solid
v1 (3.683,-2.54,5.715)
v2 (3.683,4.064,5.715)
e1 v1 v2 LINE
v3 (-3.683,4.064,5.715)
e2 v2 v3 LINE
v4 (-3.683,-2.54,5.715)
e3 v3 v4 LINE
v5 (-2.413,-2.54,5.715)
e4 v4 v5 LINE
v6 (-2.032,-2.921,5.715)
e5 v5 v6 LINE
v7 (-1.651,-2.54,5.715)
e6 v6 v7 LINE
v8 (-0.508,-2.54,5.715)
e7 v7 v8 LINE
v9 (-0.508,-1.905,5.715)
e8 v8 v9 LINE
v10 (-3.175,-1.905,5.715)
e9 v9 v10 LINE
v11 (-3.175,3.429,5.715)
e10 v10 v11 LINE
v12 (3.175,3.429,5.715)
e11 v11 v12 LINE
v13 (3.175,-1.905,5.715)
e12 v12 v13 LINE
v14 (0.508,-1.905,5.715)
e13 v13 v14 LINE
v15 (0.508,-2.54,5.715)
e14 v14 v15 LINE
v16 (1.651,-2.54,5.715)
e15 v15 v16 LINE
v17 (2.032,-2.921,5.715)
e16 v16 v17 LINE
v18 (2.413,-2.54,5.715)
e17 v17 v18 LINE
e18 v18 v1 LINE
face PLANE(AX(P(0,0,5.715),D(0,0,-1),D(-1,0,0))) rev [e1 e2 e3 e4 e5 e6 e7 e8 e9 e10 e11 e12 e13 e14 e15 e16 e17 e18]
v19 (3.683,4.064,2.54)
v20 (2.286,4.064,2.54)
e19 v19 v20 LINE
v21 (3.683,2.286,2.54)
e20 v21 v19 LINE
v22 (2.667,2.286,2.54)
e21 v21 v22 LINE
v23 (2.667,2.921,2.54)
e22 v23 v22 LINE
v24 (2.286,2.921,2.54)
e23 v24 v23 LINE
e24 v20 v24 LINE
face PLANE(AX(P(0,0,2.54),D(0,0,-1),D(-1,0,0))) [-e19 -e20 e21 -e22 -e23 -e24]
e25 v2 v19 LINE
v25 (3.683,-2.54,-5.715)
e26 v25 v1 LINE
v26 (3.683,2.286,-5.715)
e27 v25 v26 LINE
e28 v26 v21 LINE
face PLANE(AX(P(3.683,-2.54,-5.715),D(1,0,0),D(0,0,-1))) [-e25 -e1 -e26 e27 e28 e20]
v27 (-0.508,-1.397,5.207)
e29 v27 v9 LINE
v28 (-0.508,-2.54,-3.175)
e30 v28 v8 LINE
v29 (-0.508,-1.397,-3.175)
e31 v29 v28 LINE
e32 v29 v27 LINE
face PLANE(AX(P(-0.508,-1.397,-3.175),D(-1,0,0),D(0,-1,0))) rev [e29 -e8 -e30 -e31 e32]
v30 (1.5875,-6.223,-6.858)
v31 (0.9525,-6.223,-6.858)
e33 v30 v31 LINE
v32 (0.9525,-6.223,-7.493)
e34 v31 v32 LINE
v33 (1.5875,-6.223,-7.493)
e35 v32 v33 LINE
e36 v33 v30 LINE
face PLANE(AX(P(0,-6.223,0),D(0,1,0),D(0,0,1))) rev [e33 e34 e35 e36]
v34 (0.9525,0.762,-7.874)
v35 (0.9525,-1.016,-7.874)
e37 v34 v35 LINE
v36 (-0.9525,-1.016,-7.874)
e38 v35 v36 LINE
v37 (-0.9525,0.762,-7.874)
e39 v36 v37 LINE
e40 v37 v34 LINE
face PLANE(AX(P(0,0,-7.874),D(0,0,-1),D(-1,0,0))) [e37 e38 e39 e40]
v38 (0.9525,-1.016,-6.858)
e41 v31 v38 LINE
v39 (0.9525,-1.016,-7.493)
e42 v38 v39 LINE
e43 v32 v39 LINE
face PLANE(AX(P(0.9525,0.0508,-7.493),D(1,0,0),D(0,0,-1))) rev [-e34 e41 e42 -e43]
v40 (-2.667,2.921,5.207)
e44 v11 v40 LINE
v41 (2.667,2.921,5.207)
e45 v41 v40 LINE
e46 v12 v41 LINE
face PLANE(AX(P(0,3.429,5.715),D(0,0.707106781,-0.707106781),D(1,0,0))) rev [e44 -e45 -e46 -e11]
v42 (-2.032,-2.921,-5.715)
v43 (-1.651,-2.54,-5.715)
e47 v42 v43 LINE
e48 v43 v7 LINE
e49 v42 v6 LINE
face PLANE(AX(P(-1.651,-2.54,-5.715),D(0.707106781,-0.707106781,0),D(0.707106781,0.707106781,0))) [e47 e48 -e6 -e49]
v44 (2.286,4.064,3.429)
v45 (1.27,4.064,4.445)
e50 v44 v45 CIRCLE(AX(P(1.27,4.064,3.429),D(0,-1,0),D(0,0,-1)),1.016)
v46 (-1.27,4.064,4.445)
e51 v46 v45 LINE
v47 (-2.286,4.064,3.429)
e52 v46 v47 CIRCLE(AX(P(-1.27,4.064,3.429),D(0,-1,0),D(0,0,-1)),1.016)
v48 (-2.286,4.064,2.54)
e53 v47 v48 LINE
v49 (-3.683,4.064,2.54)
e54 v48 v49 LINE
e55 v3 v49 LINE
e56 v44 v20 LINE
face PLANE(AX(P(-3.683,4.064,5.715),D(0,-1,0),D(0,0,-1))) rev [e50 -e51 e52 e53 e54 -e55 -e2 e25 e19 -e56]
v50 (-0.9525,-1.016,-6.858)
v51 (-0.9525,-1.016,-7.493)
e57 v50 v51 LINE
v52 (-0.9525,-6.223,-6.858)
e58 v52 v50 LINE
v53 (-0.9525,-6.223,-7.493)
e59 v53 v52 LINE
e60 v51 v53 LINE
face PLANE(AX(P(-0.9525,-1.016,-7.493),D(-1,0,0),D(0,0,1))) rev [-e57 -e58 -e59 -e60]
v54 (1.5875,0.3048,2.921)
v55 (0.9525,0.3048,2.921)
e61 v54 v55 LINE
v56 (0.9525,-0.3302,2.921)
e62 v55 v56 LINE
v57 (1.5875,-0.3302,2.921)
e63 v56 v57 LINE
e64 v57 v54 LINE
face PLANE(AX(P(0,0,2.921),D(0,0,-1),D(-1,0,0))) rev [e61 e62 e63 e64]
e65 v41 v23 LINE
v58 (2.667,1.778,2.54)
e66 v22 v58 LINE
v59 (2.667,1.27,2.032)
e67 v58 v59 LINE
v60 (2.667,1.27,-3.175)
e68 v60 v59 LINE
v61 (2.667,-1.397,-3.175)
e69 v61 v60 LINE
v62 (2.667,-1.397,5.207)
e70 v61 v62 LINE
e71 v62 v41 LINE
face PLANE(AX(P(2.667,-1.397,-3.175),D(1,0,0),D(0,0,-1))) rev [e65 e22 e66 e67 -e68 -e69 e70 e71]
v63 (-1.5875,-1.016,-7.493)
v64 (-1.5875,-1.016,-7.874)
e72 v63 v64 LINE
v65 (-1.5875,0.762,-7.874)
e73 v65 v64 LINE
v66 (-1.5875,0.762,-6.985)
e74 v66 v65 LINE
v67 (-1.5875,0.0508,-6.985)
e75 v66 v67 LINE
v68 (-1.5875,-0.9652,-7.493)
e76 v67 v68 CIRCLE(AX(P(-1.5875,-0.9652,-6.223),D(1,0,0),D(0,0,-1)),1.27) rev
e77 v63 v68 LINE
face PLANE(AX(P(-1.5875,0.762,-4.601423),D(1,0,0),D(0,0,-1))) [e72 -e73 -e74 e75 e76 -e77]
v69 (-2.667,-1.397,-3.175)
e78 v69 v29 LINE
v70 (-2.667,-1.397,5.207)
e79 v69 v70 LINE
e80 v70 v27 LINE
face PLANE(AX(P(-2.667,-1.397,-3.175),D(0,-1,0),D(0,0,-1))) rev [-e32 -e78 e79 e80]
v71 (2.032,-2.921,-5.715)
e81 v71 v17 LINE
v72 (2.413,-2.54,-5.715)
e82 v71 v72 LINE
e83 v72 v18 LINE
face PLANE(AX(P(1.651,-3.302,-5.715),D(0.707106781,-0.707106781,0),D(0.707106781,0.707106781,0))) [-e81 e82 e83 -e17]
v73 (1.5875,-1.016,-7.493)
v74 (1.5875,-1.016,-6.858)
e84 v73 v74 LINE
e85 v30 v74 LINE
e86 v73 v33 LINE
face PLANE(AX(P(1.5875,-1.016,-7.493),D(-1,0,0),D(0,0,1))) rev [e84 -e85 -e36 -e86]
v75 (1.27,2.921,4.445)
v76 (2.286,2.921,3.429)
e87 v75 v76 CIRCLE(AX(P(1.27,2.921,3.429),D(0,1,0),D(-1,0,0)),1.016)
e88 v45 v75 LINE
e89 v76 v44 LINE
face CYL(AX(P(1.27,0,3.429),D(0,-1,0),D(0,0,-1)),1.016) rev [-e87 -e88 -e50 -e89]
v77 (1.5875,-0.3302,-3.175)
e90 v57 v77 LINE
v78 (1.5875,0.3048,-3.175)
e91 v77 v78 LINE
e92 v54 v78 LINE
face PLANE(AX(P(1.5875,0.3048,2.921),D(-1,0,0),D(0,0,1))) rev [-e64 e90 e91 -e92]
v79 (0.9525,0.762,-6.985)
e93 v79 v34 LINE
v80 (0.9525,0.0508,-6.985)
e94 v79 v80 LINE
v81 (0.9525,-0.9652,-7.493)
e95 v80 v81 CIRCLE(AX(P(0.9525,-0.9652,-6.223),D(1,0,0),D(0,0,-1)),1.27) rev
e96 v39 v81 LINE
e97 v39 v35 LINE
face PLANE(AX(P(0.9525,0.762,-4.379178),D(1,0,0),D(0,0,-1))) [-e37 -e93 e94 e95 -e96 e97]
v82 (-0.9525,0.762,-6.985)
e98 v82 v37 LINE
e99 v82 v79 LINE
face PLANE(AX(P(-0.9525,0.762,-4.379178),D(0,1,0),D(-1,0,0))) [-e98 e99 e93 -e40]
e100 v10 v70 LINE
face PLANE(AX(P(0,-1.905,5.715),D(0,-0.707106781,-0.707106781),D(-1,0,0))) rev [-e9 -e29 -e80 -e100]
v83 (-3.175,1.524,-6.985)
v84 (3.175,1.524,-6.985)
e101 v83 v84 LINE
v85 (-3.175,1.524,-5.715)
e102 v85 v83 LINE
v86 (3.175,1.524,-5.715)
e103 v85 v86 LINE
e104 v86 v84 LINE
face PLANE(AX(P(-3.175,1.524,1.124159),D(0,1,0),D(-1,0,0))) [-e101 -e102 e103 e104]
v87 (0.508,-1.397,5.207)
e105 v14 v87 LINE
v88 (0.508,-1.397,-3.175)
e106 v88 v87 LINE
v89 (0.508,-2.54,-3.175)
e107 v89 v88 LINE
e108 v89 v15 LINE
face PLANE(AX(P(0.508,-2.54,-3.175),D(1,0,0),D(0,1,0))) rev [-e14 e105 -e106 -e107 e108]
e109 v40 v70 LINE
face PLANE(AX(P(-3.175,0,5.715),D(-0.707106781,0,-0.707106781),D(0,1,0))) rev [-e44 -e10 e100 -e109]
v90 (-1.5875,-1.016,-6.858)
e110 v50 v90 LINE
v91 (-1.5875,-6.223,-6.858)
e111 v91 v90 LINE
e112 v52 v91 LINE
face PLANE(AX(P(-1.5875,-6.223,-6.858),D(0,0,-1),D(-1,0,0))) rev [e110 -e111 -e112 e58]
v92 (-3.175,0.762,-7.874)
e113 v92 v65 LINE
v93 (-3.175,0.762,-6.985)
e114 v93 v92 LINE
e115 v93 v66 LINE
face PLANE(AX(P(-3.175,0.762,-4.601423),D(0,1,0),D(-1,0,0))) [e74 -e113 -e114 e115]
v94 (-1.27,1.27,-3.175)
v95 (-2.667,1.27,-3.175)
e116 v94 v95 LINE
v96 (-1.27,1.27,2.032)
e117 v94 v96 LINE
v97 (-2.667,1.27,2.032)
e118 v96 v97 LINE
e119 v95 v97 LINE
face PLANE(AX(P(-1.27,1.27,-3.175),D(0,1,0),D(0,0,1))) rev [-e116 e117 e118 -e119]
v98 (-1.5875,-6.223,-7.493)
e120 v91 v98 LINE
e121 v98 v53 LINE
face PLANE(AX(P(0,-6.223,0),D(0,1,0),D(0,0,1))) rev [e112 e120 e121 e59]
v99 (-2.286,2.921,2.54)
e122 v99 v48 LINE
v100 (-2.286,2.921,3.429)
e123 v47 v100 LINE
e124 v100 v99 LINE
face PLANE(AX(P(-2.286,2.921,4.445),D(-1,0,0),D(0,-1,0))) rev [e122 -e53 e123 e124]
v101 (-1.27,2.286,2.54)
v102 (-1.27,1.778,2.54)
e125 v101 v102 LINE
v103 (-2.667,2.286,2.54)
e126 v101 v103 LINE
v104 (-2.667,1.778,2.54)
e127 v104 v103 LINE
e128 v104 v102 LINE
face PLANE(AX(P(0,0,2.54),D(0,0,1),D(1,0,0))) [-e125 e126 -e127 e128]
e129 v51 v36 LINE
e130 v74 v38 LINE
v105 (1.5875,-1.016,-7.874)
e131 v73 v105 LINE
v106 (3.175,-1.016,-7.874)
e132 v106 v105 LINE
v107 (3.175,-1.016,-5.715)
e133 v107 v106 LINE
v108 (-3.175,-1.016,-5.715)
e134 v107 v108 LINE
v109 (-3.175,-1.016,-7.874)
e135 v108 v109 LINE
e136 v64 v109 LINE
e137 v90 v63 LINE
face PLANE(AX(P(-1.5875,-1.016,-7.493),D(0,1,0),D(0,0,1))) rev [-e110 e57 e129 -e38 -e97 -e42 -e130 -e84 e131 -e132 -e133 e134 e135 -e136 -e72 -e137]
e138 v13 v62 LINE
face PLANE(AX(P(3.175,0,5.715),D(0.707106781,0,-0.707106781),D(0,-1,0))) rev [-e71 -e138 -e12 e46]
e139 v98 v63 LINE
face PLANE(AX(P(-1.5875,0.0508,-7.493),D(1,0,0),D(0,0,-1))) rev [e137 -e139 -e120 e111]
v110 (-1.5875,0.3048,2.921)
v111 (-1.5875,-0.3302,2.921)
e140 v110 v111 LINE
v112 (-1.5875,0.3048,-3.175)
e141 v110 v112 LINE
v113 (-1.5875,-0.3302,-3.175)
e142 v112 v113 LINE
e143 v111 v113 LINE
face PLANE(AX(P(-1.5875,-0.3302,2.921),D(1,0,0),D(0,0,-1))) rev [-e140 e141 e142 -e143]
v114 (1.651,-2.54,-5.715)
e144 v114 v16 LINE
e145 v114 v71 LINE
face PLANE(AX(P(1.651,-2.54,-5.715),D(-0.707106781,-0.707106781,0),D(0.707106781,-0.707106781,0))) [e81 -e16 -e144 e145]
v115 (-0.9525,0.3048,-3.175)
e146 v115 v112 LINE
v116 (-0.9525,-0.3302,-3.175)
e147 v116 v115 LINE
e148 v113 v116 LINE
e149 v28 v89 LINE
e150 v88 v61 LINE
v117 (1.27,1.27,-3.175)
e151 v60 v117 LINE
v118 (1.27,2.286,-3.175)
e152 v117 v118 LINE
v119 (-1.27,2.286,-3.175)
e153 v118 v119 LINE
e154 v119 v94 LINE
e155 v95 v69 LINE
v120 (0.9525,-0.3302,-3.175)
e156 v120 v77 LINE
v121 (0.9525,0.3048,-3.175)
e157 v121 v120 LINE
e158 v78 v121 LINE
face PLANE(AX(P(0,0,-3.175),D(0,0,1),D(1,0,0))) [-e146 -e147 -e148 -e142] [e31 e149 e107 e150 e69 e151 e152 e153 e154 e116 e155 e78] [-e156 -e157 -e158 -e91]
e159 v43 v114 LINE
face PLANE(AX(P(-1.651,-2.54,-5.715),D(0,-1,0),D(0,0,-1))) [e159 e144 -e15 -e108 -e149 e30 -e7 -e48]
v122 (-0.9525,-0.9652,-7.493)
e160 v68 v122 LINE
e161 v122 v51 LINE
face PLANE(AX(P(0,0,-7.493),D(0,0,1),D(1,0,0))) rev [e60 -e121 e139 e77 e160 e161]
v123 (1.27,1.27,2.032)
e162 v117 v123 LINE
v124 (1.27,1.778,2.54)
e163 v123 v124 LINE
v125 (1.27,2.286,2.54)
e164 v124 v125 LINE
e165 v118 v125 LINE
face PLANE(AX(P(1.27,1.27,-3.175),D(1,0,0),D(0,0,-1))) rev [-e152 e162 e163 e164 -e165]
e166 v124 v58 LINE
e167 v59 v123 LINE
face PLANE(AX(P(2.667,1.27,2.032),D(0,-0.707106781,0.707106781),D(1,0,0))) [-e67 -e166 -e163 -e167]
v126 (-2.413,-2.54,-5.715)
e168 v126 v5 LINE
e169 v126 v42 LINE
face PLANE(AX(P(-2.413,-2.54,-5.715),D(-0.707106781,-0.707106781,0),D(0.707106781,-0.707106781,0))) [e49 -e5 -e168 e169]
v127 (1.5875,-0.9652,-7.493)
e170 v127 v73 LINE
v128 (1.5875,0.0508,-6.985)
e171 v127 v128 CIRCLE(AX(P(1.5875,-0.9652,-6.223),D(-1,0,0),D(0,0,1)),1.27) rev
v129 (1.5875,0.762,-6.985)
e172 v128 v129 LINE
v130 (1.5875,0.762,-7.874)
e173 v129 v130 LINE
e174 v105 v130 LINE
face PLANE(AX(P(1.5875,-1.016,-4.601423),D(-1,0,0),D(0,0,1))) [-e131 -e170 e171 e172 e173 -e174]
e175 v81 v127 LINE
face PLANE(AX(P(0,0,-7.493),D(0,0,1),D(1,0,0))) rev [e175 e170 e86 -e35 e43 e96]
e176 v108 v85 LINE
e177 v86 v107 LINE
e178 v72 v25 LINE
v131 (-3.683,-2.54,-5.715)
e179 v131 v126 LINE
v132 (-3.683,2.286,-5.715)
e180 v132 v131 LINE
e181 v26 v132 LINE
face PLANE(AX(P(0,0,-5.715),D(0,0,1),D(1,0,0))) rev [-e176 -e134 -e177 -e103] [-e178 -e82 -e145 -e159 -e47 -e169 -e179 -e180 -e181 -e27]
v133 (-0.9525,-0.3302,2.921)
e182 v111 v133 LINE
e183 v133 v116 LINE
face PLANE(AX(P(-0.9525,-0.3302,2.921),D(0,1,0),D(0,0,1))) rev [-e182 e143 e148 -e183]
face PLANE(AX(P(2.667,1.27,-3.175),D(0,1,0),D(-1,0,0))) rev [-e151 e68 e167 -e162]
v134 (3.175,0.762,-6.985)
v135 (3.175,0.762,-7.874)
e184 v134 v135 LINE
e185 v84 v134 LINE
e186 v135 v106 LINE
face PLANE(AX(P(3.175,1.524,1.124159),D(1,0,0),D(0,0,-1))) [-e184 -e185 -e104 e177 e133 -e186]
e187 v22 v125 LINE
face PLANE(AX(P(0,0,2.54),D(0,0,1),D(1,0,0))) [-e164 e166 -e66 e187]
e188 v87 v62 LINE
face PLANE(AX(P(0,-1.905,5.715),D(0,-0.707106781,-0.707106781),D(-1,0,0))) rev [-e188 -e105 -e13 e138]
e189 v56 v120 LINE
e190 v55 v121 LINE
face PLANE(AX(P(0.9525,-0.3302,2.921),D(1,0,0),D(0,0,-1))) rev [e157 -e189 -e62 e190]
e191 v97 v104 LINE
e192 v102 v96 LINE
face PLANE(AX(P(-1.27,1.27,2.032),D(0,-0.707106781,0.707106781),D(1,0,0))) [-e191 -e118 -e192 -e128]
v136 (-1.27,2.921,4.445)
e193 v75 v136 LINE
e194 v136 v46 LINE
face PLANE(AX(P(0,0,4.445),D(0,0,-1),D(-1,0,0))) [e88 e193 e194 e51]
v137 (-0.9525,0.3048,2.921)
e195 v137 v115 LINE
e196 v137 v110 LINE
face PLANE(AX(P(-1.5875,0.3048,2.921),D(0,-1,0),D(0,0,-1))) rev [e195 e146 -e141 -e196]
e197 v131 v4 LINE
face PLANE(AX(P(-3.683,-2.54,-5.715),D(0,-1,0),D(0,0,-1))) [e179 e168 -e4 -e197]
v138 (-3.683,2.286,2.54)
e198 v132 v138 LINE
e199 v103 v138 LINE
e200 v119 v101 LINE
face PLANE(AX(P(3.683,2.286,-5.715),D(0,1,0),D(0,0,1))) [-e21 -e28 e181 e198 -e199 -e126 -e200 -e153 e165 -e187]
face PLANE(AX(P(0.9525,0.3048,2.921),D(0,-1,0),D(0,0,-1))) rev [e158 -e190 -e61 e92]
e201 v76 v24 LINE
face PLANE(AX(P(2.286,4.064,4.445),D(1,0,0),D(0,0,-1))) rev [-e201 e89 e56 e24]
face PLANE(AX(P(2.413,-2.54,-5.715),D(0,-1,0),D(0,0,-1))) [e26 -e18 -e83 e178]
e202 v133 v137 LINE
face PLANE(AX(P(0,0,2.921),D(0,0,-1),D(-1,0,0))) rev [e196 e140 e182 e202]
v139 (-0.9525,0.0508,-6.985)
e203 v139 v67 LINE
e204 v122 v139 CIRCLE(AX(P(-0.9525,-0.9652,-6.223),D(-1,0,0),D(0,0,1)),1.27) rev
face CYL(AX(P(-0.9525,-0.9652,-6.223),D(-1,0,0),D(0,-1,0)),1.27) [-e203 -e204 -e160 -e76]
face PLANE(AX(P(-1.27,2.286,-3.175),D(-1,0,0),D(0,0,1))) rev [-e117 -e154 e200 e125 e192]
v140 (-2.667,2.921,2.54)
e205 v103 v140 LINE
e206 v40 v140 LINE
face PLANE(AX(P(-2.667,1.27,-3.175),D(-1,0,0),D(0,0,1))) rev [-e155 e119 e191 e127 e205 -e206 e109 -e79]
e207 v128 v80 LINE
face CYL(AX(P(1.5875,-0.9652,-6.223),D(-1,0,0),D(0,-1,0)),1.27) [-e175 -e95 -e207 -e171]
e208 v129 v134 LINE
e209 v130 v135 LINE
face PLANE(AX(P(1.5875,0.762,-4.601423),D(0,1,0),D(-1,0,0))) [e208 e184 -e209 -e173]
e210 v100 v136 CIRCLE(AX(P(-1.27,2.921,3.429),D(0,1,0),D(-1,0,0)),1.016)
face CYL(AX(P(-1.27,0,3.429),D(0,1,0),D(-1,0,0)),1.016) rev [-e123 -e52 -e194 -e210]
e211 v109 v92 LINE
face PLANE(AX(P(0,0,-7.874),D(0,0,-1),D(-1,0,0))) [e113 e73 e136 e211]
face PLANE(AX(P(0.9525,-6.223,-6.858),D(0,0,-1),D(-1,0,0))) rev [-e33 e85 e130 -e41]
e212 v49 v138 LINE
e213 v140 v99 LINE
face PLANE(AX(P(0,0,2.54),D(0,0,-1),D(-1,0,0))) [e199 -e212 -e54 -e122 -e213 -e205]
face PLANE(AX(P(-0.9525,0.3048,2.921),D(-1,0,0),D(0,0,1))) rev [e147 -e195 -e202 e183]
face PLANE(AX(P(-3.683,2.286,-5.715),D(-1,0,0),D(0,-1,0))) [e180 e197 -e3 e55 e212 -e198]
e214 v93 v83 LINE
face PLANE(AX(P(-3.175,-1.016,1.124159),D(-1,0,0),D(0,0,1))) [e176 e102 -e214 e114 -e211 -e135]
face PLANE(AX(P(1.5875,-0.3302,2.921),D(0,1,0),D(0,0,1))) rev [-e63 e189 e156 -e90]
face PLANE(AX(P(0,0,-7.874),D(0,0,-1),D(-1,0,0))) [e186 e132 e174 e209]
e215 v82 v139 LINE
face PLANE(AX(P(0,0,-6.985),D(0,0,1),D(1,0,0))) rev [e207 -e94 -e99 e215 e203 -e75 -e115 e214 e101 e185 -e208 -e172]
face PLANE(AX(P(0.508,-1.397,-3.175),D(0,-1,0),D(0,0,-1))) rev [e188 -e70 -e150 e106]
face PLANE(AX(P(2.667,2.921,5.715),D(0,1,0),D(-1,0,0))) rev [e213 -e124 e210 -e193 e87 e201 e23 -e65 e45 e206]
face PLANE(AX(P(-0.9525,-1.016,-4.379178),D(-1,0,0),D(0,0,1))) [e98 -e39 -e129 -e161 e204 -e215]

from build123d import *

# Parameters (mm, degrees)
BOSS_EXTRUDE1_DEPTH  = 8.255000001
CUT_EXTRUDE1_DEPTH   = 5.715
BOSS_EXTRUDE2_DEPTH  = 3.175
SKETCH4_W            = 4.572
SKETCH4_H            = 1.143
CUT_EXTRUDE2_DEPTH   = 1.905
SKETCH5_W            = 0.635
SKETCH5_H            = 0.635
BOSS_EXTRUDE3_DEPTH  = 6.096
SKETCH6_W            = 0.635
SKETCH6_H            = 0.635
BOSS_EXTRUDE4_DEPTH  = 6.096
SKETCH7_W            = 0.635
SKETCH7_H            = 1.0668
BOSS_EXTRUDE5_DEPTH  = 1.778
SKETCH8_W            = 0.635
SKETCH8_H            = 1.0668
BOSS_EXTRUDE6_DEPTH  = 1.778
SKETCH9_W            = 0.635
SKETCH9_H            = 0.635
BOSS_EXTRUDE7_DEPTH  = 5.207
SKETCH10_W           = 0.635
SKETCH10_H           = 0.635
BOSS_EXTRUDE8_DEPTH  = 5.207
BOSS_EXTRUDE9_DEPTH  = 1.27
SKETCH12_W           = 1.5875
SKETCH12_H           = 1.778
BOSS_EXTRUDE10_DEPTH = 0.889
SKETCH13_W           = 1.905
SKETCH13_H           = 1.778
BOSS_EXTRUDE11_DEPTH = 0.889
SKETCH14_W           = 1.5875
SKETCH14_H           = 1.778
BOSS_EXTRUDE12_DEPTH = 0.889
FILLET1_R            = 1.27
FILLET2_R            = 1.27
CHAMFER1_SIZE        = 0.508
CHAMFER2_SIZE        = 0.508
DRAFT1_ANGLE         = 45
CHAMFER3_SIZE        = 0.508
FILLET3_R            = 1.016


with BuildPart() as part:
    # Sketch1 → Boss-Extrude1 (new body)
    with BuildSketch(Plane.XY.offset(2.54)):
        Polygon((3.683, 2.286), (-3.683, 2.286), (-3.683, -2.54), (-2.413, -2.54), (-1.651, -3.302), (-1.651, -2.54), (1.651, -2.54), (1.651, -3.302), (2.413, -2.54), (3.683, -2.54), align=None)
    extrude(amount=-BOSS_EXTRUDE1_DEPTH)

    # Sketch2 → Cut-Extrude1 (cut)
    with BuildSketch(Plane.XY.offset(2.54)):
        Polygon((2.667, -1.397), (2.667, 1.27), (1.27, 1.27), (1.27, 2.286000001), (-1.270000001, 2.286000001), (-1.270000001, 1.27), (-2.667, 1.27), (-2.667, -1.397), (-0.508, -1.397), (-0.508, -2.54), (0.508, -2.54), (0.508, -1.397), align=None)
    extrude(amount=-CUT_EXTRUDE1_DEPTH, mode=Mode.SUBTRACT)

    # Sketch3 → Boss-Extrude2 (add)
    with BuildSketch(Plane.XY.offset(2.54)):
        Polygon((0.508, -1.397), (2.667, -1.397), (2.667, 2.921), (-2.667, 2.921), (-2.667, -1.397), (-0.508, -1.397), (-0.508, -2.54), (-1.651, -2.54), (-1.651, -3.302), (-2.413, -2.54), (-3.683, -2.54), (-3.683, 4.064), (3.683, 4.064), (3.683, -2.54), (2.413, -2.54), (1.651, -3.302), (1.651, -2.54), (0.508, -2.54), align=None)
    extrude(amount=BOSS_EXTRUDE2_DEPTH)

    # Sketch4 → Cut-Extrude2 (cut)
    with BuildSketch(Plane(origin=(0, 0, 2.54), x_dir=(-1, 0, 0), z_dir=(0, 0, -1))):
        with Locations((0, 3.4925)):
            Rectangle(SKETCH4_W, SKETCH4_H)
    extrude(amount=-CUT_EXTRUDE2_DEPTH, mode=Mode.SUBTRACT)

    # Sketch5 → Boss-Extrude3 (add)
    with BuildSketch(Plane.XY.offset(-3.175)):
        with Locations((-1.27, -0.0127)):
            Rectangle(SKETCH5_W, SKETCH5_H)
    extrude(amount=BOSS_EXTRUDE3_DEPTH)

    # Sketch6 → Boss-Extrude4 (add)
    with BuildSketch(Plane.XY.offset(-3.175)):
        with Locations((1.27, -0.0127)):
            Rectangle(SKETCH6_W, SKETCH6_H)
    extrude(amount=BOSS_EXTRUDE4_DEPTH)

    # Sketch7 → Boss-Extrude5 (add)
    with BuildSketch(Plane(origin=(0, 0, -5.715000001), x_dir=(-1, 0, 0), z_dir=(0, 0, -1))):
        with Locations((1.27, -0.4826)):
            Rectangle(SKETCH7_W, SKETCH7_H)
    extrude(amount=BOSS_EXTRUDE5_DEPTH)

    # Sketch8 → Boss-Extrude6 (add)
    with BuildSketch(Plane(origin=(0, 0, -5.715000001), x_dir=(-1, 0, 0), z_dir=(0, 0, -1))):
        with Locations((-1.27, -0.4826)):
            Rectangle(SKETCH8_W, SKETCH8_H)
    extrude(amount=BOSS_EXTRUDE6_DEPTH)

    # Sketch9 → Boss-Extrude7 (add)
    with BuildSketch(Plane.XZ.offset(1.016)):
        with Locations((-1.27, -7.1755)):
            Rectangle(SKETCH9_W, SKETCH9_H)
    extrude(amount=BOSS_EXTRUDE7_DEPTH)

    # Sketch10 → Boss-Extrude8 (add)
    with BuildSketch(Plane.XZ.offset(1.016)):
        with Locations((1.27, -7.1755)):
            Rectangle(SKETCH10_W, SKETCH10_H)
    extrude(amount=BOSS_EXTRUDE8_DEPTH)

    # Sketch11 → Boss-Extrude9 (add)
    with BuildSketch(Plane(origin=(0, 0, -6.985), x_dir=(-1, 0, 0), z_dir=(0, 0, -1))):
        Polygon((0.9525, 0.050800001), (1.5875, 0.050800001), (1.5875, -1.016), (3.175, -1.016), (3.175, 1.524), (-3.175, 1.524), (-3.175, -1.016), (-1.5875, -1.016), (-1.5875, 0.050800001), (-0.9525, 0.050800001), (-0.9525, -1.016), (0.9525, -1.016), align=None)
    extrude(amount=-BOSS_EXTRUDE9_DEPTH)

    # Sketch12 → Boss-Extrude10 (add)
    with BuildSketch(Plane(origin=(0, 0, -7.874), x_dir=(-1, 0, 0), z_dir=(0, 0, -1))):
        with Locations((2.38125, -0.127)):
            Rectangle(SKETCH12_W, SKETCH12_H)
    extrude(amount=-BOSS_EXTRUDE10_DEPTH)

    # Sketch13 → Boss-Extrude11 (add)
    with BuildSketch(Plane(origin=(0, 0, -7.874), x_dir=(-1, 0, 0), z_dir=(0, 0, -1))):
        with Locations((0, -0.127)):
            Rectangle(SKETCH13_W, SKETCH13_H)
    extrude(amount=-BOSS_EXTRUDE11_DEPTH)

    # Sketch14 → Boss-Extrude12 (add)
    with BuildSketch(Plane(origin=(0, 0, -7.874), x_dir=(-1, 0, 0), z_dir=(0, 0, -1))):
        with Locations((-2.38125, -0.127)):
            Rectangle(SKETCH14_W, SKETCH14_H)
    extrude(amount=-BOSS_EXTRUDE12_DEPTH)

    # Fillet1
    # the kernel refuses this fillet: 1.27 mm, written as the material it takes off along each edge
    with BuildSketch(Plane(origin=(1.5875, 0.0508, -7.493), x_dir=(0, -1, 0), z_dir=(-1, 0, 0))) as fillet1_piece_1:
        with BuildLine():
            CenterArc((1.016, 1.27), FILLET1_R, 216.869897624, 53.130102376)
            Line((0, 0.508), (0, 0))
            Line((0, 0), (1.016, 0))
        make_face()
    extrude(amount=0.635, mode=Mode.SUBTRACT)

    # Fillet2
    # the kernel refuses this fillet: 1.27 mm, written as the material it takes off along each edge
    with BuildSketch(Plane(origin=(1.5875, 0.0508, -7.493), x_dir=(0, -1, 0), z_dir=(-1, 0, 0))) as fillet2_piece_1_section:
        with BuildLine():
            CenterArc((1.016, 1.27), FILLET2_R, 216.869897624, 53.130102376)
            Line((0, 0.508), (-0.02032, 0.49276))
            ThreePointArc((-0.02032, 0.49276), (-0.0254, 0.254), (-0.0254, 0))
            Line((-0.0254, 0), (0, -0.0254))
            Line((0, -0.0254), (1.016, -0.0254))
            Line((1.016, -0.0254), (1.016, 0))
        make_face()
    fillet2_piece_1 = extrude(amount=3.175, mode=Mode.PRIVATE)
    fillet2_piece_1 = split(fillet2_piece_1, bisect_by=Plane(origin=(0.9525, -0.210671932, -7.36296659), z_dir=(1, 0, 0)), keep=Keep.TOP, mode=Mode.PRIVATE)
    add(fillet2_piece_1, mode=Mode.SUBTRACT)
    with BuildSketch(Plane(origin=(-0.9525, 0.0508, -7.493), x_dir=(0, -1, 0), z_dir=(-1, 0, 0))) as fillet2_piece_2:
        with BuildLine():
            CenterArc((1.016, 1.27), FILLET2_R, 216.869897624, 53.130102376)
            Line((0, 0.508), (-0.02032, 0.49276))
            ThreePointArc((-0.02032, 0.49276), (-0.0254, 0.254), (-0.0254, 0))
            Line((-0.0254, 0), (0, -0.0254))
            Line((0, -0.0254), (1.016, -0.0254))
            Line((1.016, -0.0254), (1.016, 0))
        make_face()
    extrude(amount=0.635, mode=Mode.SUBTRACT)

    # Chamfer1
    chamfer1_edges = [part.edges().sort_by_distance(p)[0] for p in [
        (1.9685, 1.27, 2.54),
    ]]
    chamfer(chamfer1_edges, length=CHAMFER1_SIZE)

    # Chamfer2
    chamfer2_edges = [part.edges().sort_by_distance(p)[0] for p in [
        (-1.9685, 1.27, 2.54),
    ]]
    chamfer(chamfer2_edges, length=CHAMFER2_SIZE)

    # Draft1
    draft1_faces = [part.faces().sort_by_distance(p)[0] for p in [
        (1.651, -2.921, 0),
        (-1.651, -2.921, 0),
    ]]
    draft(draft1_faces, Plane(origin=(-1.651, -2.54, -5.715000001), x_dir=(0, 0, -1), z_dir=(0, -1, 0)), DRAFT1_ANGLE)

    # Chamfer3
    chamfer3_edges = [part.edges().sort_by_distance(p)[0] for p in [
        (-1.5875, -1.397, 5.715),
        (-2.667, 0.762, 5.715),
        (0, 2.921, 5.715),
        (2.667, 0.762, 5.715),
        (1.5875, -1.397, 5.715),
    ]]
    chamfer(chamfer3_edges, length=CHAMFER3_SIZE)

    # Fillet3
    fillet3_edges = [part.edges().sort_by_distance(p)[0] for p in [
        (-2.286, 3.4925, 4.445),
        (2.286, 3.4925, 4.445),
    ]]
    fillet(fillet3_edges, radius=FILLET3_R)


solid = part.part
